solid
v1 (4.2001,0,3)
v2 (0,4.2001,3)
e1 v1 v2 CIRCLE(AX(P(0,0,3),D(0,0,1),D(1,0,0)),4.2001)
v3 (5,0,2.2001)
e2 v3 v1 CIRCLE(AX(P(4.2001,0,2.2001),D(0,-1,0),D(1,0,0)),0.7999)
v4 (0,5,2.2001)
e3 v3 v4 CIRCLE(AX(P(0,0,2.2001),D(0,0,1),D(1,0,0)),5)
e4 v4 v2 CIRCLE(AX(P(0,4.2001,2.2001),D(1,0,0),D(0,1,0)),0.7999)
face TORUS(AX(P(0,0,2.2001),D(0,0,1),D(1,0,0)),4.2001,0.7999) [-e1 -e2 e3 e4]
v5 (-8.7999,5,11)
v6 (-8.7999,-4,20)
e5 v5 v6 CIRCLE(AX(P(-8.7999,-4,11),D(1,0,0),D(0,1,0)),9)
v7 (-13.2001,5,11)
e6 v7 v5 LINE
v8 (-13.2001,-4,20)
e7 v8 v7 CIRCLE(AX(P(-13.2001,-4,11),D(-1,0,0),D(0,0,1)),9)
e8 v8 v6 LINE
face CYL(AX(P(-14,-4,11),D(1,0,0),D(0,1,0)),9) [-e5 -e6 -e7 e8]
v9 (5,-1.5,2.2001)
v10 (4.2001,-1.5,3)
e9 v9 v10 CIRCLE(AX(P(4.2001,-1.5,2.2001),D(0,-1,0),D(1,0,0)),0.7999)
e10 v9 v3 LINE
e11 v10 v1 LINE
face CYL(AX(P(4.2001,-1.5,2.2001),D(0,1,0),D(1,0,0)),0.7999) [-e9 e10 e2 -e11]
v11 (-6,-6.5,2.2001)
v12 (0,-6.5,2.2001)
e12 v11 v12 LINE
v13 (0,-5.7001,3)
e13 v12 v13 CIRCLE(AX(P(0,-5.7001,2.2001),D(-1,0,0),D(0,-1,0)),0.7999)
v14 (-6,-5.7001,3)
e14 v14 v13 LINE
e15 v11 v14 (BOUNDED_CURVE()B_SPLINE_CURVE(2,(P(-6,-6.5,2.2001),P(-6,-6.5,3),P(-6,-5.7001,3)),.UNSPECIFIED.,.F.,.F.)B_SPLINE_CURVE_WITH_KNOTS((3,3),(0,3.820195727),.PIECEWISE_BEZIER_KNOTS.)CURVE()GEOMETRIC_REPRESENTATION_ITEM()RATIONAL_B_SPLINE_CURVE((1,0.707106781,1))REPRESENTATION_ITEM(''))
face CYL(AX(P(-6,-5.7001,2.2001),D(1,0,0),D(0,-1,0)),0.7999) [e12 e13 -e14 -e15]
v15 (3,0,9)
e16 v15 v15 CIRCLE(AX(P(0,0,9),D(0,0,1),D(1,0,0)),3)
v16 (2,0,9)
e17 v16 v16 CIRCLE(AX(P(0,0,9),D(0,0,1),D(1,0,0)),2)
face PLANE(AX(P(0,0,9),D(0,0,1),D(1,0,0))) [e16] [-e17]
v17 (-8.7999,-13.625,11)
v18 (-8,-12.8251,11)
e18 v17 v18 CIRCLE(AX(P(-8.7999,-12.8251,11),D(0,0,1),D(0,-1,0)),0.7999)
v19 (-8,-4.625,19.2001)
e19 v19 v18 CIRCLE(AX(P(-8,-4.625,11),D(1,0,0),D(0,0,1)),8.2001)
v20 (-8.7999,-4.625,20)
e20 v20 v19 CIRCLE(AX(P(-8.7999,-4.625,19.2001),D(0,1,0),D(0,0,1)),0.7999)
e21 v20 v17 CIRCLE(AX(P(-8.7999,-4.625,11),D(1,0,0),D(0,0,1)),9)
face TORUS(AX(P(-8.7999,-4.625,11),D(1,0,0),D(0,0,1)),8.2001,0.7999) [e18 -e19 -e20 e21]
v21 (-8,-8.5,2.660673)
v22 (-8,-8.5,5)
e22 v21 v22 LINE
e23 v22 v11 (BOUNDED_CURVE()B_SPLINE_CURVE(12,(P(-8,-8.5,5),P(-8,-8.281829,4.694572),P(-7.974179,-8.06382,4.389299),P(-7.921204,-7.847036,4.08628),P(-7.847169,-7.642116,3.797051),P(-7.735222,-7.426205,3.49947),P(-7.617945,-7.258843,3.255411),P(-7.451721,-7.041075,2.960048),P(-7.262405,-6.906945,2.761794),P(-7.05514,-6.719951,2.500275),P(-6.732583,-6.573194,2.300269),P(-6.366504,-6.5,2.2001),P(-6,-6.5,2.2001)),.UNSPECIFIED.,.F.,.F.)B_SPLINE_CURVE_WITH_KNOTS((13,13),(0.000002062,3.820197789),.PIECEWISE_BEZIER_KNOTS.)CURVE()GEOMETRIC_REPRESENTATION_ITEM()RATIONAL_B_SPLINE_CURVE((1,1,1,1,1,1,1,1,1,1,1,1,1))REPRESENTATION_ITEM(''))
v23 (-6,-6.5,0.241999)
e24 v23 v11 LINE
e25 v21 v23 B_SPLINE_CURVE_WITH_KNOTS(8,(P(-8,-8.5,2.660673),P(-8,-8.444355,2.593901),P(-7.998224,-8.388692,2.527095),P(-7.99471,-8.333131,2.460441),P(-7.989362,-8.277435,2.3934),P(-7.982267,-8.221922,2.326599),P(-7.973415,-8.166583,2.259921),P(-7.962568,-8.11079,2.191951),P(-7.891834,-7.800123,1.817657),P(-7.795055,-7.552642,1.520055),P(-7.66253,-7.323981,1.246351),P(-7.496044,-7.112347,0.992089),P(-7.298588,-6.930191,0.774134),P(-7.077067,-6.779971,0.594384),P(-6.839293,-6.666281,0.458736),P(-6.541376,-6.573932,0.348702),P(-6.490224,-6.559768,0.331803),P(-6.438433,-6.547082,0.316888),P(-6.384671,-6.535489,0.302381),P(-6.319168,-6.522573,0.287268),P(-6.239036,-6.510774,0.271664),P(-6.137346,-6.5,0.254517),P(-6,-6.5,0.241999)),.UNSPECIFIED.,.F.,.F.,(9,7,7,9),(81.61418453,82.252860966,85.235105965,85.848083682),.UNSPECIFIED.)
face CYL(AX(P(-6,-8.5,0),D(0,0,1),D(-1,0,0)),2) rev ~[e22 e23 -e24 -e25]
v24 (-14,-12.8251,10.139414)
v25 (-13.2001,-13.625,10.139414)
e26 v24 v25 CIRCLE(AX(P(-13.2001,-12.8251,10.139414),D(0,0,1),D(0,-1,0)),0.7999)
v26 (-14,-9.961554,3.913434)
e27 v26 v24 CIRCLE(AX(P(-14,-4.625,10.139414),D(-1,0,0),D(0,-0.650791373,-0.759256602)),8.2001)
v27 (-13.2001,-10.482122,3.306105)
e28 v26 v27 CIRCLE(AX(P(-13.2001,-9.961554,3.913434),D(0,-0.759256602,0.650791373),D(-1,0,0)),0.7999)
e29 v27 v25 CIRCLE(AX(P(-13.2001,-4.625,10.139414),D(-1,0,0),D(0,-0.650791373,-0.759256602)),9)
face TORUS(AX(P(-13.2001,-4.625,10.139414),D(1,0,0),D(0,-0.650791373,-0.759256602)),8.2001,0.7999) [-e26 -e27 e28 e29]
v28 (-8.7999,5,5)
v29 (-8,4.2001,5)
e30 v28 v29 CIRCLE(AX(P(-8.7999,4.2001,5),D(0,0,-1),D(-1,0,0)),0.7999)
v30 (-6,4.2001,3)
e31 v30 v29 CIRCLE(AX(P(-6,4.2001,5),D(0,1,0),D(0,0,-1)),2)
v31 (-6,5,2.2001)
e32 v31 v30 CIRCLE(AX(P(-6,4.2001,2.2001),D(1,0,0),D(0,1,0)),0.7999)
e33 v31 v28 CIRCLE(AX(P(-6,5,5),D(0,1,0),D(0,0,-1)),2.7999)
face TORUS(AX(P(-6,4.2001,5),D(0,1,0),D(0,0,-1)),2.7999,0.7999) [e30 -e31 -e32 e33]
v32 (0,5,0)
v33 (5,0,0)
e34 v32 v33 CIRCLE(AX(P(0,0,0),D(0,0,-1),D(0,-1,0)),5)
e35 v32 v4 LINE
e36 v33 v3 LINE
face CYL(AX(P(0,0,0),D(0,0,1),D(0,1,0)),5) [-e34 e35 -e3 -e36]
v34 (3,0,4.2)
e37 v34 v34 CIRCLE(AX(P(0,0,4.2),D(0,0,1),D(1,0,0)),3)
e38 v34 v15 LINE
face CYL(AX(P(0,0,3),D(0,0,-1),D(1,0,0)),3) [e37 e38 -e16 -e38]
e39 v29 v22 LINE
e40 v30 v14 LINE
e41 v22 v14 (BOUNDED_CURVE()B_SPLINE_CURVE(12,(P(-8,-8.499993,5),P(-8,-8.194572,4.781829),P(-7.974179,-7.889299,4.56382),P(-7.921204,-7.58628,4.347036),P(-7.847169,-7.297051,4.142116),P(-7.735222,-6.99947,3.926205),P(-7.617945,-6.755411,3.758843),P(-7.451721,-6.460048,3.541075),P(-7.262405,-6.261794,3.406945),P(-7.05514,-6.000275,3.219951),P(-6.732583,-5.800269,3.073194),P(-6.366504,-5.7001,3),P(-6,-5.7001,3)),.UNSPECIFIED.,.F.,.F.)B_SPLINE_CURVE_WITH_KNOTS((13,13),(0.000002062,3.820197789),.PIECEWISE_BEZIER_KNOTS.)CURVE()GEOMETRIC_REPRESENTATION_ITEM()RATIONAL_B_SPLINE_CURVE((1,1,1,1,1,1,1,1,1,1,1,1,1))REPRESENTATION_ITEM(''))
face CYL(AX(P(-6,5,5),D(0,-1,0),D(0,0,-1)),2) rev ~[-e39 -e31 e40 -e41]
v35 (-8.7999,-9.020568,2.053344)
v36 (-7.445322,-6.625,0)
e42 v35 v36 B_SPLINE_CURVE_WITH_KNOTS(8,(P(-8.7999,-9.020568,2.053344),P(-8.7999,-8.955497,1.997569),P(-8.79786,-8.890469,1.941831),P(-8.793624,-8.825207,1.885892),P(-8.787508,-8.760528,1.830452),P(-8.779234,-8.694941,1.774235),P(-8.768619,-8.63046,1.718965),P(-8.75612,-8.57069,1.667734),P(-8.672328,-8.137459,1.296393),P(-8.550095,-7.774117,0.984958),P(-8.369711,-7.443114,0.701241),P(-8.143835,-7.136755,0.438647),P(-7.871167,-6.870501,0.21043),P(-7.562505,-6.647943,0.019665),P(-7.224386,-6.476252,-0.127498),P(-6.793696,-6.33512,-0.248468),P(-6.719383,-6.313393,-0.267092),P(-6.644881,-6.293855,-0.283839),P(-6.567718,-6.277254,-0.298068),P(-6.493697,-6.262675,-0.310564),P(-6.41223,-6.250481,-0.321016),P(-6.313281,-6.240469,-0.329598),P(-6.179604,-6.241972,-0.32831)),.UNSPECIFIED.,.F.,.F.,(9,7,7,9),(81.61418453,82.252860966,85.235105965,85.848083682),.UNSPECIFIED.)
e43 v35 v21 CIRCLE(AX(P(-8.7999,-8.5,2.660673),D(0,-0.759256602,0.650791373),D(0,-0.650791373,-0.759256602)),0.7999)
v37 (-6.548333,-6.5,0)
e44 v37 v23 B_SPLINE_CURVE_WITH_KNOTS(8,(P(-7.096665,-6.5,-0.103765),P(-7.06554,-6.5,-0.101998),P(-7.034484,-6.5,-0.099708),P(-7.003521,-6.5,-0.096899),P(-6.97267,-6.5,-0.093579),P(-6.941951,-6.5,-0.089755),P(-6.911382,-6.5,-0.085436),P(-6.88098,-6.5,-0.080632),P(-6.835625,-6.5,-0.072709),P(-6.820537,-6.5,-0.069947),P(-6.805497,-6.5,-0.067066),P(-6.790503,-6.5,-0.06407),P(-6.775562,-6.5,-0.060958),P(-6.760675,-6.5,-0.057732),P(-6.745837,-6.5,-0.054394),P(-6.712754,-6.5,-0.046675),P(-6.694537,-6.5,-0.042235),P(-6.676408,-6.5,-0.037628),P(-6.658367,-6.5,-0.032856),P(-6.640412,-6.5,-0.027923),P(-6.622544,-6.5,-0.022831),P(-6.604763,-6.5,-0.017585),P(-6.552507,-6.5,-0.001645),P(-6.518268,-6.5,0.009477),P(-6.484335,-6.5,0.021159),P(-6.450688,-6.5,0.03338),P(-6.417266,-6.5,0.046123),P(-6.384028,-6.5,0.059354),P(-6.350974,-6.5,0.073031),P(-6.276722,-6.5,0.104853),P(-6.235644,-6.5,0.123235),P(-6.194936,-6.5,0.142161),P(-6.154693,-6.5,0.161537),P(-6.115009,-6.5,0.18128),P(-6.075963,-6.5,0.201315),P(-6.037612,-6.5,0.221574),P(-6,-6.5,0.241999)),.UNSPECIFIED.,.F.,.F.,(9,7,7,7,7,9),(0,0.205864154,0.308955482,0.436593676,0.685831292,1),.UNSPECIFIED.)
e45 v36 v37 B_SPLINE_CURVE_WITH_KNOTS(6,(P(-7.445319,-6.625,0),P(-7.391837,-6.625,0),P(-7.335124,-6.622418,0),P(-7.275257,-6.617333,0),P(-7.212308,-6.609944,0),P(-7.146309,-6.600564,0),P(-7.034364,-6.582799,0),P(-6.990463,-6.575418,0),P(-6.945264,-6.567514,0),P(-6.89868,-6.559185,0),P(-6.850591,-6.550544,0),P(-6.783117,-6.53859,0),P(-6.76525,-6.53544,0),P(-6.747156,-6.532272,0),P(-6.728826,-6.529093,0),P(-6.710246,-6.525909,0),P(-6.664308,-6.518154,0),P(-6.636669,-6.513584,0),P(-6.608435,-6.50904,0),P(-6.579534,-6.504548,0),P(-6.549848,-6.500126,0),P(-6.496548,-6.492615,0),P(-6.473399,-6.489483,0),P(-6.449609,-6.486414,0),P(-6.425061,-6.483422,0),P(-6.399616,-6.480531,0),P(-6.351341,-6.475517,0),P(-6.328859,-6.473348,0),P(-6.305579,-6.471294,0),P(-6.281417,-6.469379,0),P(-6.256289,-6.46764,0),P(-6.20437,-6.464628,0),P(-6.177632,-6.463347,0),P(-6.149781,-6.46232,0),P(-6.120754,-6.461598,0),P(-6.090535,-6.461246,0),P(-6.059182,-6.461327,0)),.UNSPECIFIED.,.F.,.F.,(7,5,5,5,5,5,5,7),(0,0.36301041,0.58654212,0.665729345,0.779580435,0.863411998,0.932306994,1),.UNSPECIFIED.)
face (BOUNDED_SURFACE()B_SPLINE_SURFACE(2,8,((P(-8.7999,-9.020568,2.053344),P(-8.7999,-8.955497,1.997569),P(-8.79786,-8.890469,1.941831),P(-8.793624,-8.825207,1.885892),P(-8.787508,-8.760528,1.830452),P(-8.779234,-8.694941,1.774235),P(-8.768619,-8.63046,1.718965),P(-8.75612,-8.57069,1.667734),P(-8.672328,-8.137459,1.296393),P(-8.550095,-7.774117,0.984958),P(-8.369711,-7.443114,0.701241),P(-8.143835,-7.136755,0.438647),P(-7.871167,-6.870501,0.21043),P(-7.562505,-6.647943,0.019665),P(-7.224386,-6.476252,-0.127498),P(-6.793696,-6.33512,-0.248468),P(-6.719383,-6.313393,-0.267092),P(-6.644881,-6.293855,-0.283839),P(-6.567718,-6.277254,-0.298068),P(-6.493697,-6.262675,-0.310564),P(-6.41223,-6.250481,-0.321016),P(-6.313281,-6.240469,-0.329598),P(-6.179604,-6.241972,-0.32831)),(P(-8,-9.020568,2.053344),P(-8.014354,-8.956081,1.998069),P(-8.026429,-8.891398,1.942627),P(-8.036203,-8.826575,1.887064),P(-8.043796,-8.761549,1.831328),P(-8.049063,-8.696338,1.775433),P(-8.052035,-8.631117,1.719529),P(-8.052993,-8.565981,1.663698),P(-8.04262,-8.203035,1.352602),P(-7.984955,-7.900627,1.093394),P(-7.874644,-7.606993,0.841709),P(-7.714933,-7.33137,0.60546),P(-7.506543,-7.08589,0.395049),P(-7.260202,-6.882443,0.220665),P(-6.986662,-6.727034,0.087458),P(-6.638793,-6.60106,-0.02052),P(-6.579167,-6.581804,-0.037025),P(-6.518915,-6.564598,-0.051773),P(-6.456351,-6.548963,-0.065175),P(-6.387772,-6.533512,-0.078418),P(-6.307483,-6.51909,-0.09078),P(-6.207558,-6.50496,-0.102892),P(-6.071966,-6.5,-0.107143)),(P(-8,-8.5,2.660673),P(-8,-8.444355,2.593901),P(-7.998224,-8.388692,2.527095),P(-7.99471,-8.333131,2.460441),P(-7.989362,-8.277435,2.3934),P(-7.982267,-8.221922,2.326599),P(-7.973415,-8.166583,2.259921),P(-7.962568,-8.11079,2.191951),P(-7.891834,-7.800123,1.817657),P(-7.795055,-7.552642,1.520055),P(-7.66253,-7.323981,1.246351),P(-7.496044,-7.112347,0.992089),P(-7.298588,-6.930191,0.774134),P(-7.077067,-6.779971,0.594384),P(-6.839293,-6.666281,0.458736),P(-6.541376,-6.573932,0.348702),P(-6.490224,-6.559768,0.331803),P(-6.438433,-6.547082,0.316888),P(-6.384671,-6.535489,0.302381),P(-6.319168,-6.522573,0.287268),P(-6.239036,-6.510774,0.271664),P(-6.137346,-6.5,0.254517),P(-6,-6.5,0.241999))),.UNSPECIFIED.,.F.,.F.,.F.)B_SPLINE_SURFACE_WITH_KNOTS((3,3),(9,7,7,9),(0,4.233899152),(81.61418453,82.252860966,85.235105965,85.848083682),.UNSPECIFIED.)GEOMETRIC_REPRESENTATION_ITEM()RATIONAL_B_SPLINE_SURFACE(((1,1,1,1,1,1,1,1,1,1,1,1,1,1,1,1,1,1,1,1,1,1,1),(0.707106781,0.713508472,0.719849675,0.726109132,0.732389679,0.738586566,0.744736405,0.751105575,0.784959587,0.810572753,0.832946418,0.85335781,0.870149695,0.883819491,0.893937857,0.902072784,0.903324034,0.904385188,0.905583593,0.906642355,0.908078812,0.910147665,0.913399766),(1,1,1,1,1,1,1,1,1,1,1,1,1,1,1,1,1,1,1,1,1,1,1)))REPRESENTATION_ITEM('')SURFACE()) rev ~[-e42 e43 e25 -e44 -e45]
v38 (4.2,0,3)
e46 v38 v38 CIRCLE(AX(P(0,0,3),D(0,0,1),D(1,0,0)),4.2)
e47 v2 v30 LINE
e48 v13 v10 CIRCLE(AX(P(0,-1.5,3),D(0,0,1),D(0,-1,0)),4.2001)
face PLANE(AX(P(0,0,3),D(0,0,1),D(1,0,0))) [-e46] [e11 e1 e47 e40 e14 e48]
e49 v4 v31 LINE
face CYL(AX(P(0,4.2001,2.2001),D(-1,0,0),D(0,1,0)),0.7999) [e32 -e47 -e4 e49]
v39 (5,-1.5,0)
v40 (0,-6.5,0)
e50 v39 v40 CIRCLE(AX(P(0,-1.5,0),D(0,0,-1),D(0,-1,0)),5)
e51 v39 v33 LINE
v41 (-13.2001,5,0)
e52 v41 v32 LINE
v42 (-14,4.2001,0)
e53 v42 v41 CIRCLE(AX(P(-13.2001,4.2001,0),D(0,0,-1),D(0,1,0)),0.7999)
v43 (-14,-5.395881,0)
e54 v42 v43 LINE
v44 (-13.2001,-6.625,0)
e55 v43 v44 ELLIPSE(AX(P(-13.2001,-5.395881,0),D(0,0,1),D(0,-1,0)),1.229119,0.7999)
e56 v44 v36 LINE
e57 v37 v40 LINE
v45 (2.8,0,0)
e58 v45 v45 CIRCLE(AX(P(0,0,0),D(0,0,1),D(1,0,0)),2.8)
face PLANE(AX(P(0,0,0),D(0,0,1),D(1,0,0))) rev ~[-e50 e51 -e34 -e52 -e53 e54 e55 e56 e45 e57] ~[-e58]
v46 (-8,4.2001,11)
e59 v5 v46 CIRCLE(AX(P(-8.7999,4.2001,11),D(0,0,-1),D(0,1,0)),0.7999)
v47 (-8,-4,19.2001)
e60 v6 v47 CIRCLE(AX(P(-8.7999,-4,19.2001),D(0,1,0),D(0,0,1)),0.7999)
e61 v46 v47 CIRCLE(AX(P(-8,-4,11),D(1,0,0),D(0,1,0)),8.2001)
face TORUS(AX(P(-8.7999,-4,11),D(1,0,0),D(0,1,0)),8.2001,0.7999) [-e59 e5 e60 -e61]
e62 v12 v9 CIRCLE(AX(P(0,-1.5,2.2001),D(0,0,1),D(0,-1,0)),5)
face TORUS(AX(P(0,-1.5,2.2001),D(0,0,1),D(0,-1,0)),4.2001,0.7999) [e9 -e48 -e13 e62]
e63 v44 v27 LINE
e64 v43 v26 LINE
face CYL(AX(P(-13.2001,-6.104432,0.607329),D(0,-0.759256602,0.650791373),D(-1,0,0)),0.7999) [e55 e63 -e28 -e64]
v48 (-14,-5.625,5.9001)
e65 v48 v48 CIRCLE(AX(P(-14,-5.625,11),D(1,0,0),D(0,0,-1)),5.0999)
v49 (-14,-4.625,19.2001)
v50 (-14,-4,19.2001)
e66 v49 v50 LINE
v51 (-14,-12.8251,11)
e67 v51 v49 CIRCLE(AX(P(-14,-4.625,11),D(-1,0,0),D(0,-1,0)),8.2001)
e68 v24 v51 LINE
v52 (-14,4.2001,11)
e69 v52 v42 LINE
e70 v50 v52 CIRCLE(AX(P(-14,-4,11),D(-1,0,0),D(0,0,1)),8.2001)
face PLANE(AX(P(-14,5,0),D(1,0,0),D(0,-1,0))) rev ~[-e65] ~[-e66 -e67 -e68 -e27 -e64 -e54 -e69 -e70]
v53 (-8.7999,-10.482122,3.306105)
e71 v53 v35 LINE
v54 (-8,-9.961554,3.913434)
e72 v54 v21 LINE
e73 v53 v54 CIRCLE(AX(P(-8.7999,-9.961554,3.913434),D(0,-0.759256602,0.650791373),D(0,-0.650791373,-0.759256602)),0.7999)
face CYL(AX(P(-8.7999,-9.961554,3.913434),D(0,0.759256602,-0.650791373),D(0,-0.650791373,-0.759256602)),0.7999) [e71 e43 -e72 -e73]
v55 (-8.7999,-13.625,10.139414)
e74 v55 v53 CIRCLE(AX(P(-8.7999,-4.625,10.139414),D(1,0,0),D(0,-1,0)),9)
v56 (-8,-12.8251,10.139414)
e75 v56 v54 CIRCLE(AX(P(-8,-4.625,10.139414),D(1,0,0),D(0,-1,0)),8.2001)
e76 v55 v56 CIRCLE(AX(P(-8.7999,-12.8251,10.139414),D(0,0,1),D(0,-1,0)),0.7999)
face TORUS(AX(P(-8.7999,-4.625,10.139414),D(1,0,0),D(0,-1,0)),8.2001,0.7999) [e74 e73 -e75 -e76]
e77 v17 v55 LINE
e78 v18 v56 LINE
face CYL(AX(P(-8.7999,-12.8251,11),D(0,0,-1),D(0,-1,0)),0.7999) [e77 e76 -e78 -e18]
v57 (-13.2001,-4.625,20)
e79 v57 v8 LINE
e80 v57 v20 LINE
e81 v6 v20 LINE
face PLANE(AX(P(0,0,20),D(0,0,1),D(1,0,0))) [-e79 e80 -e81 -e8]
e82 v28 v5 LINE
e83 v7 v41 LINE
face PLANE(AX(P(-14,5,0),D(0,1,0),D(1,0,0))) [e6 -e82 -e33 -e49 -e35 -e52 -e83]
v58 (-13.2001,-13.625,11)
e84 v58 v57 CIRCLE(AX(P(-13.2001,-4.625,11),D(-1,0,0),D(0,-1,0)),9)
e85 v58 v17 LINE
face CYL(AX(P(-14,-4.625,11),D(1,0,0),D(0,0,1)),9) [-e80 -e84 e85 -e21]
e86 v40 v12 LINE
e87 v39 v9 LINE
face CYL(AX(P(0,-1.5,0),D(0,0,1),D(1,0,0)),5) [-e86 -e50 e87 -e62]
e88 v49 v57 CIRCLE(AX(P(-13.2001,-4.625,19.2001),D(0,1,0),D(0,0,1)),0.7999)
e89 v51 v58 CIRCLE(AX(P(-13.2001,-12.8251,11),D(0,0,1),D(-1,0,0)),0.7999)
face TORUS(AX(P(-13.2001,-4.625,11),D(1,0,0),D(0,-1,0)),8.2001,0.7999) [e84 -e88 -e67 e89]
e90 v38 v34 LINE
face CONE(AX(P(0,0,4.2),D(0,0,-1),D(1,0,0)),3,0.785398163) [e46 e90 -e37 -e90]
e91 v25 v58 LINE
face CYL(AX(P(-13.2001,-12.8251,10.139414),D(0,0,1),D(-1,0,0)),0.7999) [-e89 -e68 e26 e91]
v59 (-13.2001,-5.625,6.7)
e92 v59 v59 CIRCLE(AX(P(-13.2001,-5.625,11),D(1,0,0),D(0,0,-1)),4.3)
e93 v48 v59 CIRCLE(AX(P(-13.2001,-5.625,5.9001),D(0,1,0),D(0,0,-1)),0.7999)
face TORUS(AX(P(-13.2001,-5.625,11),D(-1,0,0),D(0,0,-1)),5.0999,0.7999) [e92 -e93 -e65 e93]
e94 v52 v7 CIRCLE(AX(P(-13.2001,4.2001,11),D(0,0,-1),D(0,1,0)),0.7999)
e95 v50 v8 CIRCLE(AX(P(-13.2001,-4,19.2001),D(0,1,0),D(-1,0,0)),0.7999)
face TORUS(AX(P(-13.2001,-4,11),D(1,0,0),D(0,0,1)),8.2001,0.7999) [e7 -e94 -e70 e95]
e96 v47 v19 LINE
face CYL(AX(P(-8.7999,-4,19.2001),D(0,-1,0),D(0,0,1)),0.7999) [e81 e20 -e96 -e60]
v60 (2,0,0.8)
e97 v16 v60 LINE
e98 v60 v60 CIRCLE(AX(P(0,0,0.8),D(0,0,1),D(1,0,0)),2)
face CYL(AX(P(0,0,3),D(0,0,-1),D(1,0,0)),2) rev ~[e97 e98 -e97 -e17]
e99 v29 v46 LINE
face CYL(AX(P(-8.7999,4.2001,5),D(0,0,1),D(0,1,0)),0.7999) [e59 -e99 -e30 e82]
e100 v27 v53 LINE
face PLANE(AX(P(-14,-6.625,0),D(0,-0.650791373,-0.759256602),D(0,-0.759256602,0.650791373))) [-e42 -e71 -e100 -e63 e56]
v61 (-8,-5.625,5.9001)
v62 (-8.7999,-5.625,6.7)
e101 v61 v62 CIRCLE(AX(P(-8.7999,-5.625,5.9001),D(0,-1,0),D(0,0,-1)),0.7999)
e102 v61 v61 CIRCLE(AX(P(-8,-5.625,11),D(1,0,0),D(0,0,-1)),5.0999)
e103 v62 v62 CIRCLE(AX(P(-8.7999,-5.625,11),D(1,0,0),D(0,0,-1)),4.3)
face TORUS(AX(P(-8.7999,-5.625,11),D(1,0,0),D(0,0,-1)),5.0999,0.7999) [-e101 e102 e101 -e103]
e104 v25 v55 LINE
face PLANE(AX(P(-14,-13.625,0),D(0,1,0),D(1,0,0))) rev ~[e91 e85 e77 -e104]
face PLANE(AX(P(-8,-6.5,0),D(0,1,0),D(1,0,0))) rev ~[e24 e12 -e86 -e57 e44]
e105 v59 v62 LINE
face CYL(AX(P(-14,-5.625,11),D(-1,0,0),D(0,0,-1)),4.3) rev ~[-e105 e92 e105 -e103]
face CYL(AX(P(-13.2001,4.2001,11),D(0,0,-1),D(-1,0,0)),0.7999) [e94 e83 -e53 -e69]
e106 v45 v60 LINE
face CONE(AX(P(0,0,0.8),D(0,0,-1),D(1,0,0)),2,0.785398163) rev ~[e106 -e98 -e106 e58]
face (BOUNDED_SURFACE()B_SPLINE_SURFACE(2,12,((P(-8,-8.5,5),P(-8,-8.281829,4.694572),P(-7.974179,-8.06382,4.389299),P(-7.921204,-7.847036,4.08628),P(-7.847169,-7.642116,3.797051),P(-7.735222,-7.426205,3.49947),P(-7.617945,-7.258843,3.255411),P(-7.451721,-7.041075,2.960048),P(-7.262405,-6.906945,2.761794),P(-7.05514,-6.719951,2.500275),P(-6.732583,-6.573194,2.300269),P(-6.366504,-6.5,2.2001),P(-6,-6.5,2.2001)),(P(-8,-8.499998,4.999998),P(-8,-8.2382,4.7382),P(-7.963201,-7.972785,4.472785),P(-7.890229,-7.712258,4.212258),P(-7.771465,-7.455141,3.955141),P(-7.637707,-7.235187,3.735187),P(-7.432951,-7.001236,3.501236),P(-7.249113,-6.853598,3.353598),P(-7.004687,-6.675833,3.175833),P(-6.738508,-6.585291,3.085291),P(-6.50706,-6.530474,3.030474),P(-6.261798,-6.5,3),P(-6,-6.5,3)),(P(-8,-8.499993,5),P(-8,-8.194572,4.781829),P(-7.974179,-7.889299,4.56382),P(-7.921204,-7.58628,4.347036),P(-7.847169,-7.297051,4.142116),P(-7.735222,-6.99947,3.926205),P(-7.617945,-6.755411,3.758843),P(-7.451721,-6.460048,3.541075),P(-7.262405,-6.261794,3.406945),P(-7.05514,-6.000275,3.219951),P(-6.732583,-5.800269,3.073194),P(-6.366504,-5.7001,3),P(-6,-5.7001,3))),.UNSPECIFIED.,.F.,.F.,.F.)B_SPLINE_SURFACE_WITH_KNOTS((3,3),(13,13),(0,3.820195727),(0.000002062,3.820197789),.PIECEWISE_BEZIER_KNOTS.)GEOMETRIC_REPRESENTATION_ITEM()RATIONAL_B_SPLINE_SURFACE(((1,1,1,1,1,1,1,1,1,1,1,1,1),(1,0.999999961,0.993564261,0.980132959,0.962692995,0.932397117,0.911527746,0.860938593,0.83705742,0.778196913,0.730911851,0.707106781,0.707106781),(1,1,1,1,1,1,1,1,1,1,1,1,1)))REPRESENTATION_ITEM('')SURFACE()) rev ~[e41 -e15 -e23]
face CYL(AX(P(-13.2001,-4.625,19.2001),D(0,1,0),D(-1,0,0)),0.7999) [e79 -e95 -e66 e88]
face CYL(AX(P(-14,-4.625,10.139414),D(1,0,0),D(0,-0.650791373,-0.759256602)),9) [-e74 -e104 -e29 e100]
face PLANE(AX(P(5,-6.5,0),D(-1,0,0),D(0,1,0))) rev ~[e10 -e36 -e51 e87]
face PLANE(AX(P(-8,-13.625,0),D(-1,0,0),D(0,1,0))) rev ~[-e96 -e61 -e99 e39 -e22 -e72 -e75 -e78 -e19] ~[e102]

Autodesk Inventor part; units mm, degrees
ref_plane "YZ Plane" through (0, 0, 0) normal (1, 0, 0) x (0, 1, 0)
ref_plane "XZ Plane" through (0, 0, 0) normal (0, 1, 0) x (-1, 0, 0)
ref_plane "XY Plane" through (0, 0, 0) normal (0, 0, 1) x (1, 0, 0)
sketch "Эскиз1" plane through (0, 0, 0) normal (0, 0, 1) x (1, 0, 0)
  circle A0 centre (0, 0) radius 2
  circle A1 centre (0, 0) radius 5.625 construction
  line L0 (-14, -9.625) -> (5, -9.625) construction
  line L1 (5, -9.625) -> (5, -1.625) construction
  line L2 (-14, -1.625) -> (-14, -9.625) construction
  line L3 (-14, -5.625) -> (5, -5.625) construction
  line L4 (-14, -13.625) -> (5, -13.625)
  line L5 (5, -13.625) -> (5, 5)
  line L6 (-14, 5) -> (-14, -13.625)
  circle A2 centre (0, 0) radius 6.5 construction
  line L7 (-14, 5) -> (5, 5)
  line L8 (0, -17.65) -> (0, 10.525) construction
  line L9 (-8, 5) -> (-8, -13.625) construction
  line L10 (-18.1, 0) -> (10.6, 0) construction
  line L11 (-8, -13.625) -> (-8, -6.5)
  line L12 (-8, -6.5) -> (5, -6.5)
  dimension "d0" = 4
  dimension "d1" = 11.25
  dimension "d5" = 13
  dimension "d11" = 6
  dimension "d36" = 5
  dimension "d37" = 5
  dimension "d39" = 8
  dimension "d40" = 4
  dimension "d41" = 4
extrude "Выдавливание1" add sketch "Эскиз1" along normal blind 3 contours L6 L7 L5 L12 L11 L4
sketch "Эскиз3" plane through (0, 0, 3) normal (0, 0, 1) x (1, 0, 0)
  line L0 (-14, -13.625) -> (-8, -13.625) projected
  line L1 (-14, 5) -> (-8, 5)
  line L2 (-8, 5) -> (-8, -13.625)
  line L3 (-8, -13.625) -> (-14, -13.625)
  line L4 (-14, -13.625) -> (-14, 5)
  point P0 (0, 0)
  point P1 (5, -13.625)
  point P2 (4, 5)
  dimension "d17" = 6
extrude "Выдавливание3" add sketch "Эскиз3" along normal blind 17
sketch "Эскиз4" plane through (-14, -13.625, 0) normal (1, 0, 0) x (0, 0, -1)
  circle A0 centre (-11, 8) radius 4.3
  line L0 (0, 7.125) -> (0, 18.625) projected
  line L1 (0, 0) -> (-20, 0) projected
  line L2 (-20, 18.625) -> (-20, 0) projected
  line L3 (0, 18.625) -> (0, 0) projected
  line L4 (0, 7) -> (-6, 0)
  point P0 (0, 13.625)
  dimension "d20" = 8.6
  dimension "d42" = 9
  dimension "d48" = 8
  dimension "d49" = 7
  dimension "d50" = 6
extrude "Выдавливание4" cut sketch "Эскиз4" along normal up to surface (6 mm away)
sketch "Эскиз2" plane through (0, 0, 3) normal (0, 0, 1) x (1, 0, 0)
  circle A0 centre (0, 0) radius 3
  circle A1 centre (0, 0) radius 2 projected
  dimension "d14" = 6
extrude "Выдавливание2" add sketch "Эскиз2" along normal blind 6
fillet "Сопряжение1" radius 9 3 edges at (-11, 5, 20) (-11, -13.625, 20) (-11, -13.625, 6)
fillet "Сопряжение1" radius 5 2 edges at (5, 5, 1.5) (5, -6.5, 1.5)
fillet "Сопряжение1" radius 2 2 edges at (-8, -6.5, 1.5) (-8, -0.75, 3)
chamfer "Фаска1" distance 1.2 angle 45 1 edges at (-3, 0, 3)
fillet "Сопряжение2" radius 0.8 9 edges at (-8, -5.625, 15.3) (-14, -5.625, 15.3) (-14, -13.625, 10.5697) (-14, 2.364, 17.364) (-8, 5, 8) (-8, -13.625, 10.5697) (-8, 2.364, 17.364) (-8, -9.4911, 2.4566) (-14, -8.5536, 1.6531)
chamfer "Фаска2" distance 0.8 angle 45 1 edges at (-2, 0, 0)
properties part number "Петля ролика"
